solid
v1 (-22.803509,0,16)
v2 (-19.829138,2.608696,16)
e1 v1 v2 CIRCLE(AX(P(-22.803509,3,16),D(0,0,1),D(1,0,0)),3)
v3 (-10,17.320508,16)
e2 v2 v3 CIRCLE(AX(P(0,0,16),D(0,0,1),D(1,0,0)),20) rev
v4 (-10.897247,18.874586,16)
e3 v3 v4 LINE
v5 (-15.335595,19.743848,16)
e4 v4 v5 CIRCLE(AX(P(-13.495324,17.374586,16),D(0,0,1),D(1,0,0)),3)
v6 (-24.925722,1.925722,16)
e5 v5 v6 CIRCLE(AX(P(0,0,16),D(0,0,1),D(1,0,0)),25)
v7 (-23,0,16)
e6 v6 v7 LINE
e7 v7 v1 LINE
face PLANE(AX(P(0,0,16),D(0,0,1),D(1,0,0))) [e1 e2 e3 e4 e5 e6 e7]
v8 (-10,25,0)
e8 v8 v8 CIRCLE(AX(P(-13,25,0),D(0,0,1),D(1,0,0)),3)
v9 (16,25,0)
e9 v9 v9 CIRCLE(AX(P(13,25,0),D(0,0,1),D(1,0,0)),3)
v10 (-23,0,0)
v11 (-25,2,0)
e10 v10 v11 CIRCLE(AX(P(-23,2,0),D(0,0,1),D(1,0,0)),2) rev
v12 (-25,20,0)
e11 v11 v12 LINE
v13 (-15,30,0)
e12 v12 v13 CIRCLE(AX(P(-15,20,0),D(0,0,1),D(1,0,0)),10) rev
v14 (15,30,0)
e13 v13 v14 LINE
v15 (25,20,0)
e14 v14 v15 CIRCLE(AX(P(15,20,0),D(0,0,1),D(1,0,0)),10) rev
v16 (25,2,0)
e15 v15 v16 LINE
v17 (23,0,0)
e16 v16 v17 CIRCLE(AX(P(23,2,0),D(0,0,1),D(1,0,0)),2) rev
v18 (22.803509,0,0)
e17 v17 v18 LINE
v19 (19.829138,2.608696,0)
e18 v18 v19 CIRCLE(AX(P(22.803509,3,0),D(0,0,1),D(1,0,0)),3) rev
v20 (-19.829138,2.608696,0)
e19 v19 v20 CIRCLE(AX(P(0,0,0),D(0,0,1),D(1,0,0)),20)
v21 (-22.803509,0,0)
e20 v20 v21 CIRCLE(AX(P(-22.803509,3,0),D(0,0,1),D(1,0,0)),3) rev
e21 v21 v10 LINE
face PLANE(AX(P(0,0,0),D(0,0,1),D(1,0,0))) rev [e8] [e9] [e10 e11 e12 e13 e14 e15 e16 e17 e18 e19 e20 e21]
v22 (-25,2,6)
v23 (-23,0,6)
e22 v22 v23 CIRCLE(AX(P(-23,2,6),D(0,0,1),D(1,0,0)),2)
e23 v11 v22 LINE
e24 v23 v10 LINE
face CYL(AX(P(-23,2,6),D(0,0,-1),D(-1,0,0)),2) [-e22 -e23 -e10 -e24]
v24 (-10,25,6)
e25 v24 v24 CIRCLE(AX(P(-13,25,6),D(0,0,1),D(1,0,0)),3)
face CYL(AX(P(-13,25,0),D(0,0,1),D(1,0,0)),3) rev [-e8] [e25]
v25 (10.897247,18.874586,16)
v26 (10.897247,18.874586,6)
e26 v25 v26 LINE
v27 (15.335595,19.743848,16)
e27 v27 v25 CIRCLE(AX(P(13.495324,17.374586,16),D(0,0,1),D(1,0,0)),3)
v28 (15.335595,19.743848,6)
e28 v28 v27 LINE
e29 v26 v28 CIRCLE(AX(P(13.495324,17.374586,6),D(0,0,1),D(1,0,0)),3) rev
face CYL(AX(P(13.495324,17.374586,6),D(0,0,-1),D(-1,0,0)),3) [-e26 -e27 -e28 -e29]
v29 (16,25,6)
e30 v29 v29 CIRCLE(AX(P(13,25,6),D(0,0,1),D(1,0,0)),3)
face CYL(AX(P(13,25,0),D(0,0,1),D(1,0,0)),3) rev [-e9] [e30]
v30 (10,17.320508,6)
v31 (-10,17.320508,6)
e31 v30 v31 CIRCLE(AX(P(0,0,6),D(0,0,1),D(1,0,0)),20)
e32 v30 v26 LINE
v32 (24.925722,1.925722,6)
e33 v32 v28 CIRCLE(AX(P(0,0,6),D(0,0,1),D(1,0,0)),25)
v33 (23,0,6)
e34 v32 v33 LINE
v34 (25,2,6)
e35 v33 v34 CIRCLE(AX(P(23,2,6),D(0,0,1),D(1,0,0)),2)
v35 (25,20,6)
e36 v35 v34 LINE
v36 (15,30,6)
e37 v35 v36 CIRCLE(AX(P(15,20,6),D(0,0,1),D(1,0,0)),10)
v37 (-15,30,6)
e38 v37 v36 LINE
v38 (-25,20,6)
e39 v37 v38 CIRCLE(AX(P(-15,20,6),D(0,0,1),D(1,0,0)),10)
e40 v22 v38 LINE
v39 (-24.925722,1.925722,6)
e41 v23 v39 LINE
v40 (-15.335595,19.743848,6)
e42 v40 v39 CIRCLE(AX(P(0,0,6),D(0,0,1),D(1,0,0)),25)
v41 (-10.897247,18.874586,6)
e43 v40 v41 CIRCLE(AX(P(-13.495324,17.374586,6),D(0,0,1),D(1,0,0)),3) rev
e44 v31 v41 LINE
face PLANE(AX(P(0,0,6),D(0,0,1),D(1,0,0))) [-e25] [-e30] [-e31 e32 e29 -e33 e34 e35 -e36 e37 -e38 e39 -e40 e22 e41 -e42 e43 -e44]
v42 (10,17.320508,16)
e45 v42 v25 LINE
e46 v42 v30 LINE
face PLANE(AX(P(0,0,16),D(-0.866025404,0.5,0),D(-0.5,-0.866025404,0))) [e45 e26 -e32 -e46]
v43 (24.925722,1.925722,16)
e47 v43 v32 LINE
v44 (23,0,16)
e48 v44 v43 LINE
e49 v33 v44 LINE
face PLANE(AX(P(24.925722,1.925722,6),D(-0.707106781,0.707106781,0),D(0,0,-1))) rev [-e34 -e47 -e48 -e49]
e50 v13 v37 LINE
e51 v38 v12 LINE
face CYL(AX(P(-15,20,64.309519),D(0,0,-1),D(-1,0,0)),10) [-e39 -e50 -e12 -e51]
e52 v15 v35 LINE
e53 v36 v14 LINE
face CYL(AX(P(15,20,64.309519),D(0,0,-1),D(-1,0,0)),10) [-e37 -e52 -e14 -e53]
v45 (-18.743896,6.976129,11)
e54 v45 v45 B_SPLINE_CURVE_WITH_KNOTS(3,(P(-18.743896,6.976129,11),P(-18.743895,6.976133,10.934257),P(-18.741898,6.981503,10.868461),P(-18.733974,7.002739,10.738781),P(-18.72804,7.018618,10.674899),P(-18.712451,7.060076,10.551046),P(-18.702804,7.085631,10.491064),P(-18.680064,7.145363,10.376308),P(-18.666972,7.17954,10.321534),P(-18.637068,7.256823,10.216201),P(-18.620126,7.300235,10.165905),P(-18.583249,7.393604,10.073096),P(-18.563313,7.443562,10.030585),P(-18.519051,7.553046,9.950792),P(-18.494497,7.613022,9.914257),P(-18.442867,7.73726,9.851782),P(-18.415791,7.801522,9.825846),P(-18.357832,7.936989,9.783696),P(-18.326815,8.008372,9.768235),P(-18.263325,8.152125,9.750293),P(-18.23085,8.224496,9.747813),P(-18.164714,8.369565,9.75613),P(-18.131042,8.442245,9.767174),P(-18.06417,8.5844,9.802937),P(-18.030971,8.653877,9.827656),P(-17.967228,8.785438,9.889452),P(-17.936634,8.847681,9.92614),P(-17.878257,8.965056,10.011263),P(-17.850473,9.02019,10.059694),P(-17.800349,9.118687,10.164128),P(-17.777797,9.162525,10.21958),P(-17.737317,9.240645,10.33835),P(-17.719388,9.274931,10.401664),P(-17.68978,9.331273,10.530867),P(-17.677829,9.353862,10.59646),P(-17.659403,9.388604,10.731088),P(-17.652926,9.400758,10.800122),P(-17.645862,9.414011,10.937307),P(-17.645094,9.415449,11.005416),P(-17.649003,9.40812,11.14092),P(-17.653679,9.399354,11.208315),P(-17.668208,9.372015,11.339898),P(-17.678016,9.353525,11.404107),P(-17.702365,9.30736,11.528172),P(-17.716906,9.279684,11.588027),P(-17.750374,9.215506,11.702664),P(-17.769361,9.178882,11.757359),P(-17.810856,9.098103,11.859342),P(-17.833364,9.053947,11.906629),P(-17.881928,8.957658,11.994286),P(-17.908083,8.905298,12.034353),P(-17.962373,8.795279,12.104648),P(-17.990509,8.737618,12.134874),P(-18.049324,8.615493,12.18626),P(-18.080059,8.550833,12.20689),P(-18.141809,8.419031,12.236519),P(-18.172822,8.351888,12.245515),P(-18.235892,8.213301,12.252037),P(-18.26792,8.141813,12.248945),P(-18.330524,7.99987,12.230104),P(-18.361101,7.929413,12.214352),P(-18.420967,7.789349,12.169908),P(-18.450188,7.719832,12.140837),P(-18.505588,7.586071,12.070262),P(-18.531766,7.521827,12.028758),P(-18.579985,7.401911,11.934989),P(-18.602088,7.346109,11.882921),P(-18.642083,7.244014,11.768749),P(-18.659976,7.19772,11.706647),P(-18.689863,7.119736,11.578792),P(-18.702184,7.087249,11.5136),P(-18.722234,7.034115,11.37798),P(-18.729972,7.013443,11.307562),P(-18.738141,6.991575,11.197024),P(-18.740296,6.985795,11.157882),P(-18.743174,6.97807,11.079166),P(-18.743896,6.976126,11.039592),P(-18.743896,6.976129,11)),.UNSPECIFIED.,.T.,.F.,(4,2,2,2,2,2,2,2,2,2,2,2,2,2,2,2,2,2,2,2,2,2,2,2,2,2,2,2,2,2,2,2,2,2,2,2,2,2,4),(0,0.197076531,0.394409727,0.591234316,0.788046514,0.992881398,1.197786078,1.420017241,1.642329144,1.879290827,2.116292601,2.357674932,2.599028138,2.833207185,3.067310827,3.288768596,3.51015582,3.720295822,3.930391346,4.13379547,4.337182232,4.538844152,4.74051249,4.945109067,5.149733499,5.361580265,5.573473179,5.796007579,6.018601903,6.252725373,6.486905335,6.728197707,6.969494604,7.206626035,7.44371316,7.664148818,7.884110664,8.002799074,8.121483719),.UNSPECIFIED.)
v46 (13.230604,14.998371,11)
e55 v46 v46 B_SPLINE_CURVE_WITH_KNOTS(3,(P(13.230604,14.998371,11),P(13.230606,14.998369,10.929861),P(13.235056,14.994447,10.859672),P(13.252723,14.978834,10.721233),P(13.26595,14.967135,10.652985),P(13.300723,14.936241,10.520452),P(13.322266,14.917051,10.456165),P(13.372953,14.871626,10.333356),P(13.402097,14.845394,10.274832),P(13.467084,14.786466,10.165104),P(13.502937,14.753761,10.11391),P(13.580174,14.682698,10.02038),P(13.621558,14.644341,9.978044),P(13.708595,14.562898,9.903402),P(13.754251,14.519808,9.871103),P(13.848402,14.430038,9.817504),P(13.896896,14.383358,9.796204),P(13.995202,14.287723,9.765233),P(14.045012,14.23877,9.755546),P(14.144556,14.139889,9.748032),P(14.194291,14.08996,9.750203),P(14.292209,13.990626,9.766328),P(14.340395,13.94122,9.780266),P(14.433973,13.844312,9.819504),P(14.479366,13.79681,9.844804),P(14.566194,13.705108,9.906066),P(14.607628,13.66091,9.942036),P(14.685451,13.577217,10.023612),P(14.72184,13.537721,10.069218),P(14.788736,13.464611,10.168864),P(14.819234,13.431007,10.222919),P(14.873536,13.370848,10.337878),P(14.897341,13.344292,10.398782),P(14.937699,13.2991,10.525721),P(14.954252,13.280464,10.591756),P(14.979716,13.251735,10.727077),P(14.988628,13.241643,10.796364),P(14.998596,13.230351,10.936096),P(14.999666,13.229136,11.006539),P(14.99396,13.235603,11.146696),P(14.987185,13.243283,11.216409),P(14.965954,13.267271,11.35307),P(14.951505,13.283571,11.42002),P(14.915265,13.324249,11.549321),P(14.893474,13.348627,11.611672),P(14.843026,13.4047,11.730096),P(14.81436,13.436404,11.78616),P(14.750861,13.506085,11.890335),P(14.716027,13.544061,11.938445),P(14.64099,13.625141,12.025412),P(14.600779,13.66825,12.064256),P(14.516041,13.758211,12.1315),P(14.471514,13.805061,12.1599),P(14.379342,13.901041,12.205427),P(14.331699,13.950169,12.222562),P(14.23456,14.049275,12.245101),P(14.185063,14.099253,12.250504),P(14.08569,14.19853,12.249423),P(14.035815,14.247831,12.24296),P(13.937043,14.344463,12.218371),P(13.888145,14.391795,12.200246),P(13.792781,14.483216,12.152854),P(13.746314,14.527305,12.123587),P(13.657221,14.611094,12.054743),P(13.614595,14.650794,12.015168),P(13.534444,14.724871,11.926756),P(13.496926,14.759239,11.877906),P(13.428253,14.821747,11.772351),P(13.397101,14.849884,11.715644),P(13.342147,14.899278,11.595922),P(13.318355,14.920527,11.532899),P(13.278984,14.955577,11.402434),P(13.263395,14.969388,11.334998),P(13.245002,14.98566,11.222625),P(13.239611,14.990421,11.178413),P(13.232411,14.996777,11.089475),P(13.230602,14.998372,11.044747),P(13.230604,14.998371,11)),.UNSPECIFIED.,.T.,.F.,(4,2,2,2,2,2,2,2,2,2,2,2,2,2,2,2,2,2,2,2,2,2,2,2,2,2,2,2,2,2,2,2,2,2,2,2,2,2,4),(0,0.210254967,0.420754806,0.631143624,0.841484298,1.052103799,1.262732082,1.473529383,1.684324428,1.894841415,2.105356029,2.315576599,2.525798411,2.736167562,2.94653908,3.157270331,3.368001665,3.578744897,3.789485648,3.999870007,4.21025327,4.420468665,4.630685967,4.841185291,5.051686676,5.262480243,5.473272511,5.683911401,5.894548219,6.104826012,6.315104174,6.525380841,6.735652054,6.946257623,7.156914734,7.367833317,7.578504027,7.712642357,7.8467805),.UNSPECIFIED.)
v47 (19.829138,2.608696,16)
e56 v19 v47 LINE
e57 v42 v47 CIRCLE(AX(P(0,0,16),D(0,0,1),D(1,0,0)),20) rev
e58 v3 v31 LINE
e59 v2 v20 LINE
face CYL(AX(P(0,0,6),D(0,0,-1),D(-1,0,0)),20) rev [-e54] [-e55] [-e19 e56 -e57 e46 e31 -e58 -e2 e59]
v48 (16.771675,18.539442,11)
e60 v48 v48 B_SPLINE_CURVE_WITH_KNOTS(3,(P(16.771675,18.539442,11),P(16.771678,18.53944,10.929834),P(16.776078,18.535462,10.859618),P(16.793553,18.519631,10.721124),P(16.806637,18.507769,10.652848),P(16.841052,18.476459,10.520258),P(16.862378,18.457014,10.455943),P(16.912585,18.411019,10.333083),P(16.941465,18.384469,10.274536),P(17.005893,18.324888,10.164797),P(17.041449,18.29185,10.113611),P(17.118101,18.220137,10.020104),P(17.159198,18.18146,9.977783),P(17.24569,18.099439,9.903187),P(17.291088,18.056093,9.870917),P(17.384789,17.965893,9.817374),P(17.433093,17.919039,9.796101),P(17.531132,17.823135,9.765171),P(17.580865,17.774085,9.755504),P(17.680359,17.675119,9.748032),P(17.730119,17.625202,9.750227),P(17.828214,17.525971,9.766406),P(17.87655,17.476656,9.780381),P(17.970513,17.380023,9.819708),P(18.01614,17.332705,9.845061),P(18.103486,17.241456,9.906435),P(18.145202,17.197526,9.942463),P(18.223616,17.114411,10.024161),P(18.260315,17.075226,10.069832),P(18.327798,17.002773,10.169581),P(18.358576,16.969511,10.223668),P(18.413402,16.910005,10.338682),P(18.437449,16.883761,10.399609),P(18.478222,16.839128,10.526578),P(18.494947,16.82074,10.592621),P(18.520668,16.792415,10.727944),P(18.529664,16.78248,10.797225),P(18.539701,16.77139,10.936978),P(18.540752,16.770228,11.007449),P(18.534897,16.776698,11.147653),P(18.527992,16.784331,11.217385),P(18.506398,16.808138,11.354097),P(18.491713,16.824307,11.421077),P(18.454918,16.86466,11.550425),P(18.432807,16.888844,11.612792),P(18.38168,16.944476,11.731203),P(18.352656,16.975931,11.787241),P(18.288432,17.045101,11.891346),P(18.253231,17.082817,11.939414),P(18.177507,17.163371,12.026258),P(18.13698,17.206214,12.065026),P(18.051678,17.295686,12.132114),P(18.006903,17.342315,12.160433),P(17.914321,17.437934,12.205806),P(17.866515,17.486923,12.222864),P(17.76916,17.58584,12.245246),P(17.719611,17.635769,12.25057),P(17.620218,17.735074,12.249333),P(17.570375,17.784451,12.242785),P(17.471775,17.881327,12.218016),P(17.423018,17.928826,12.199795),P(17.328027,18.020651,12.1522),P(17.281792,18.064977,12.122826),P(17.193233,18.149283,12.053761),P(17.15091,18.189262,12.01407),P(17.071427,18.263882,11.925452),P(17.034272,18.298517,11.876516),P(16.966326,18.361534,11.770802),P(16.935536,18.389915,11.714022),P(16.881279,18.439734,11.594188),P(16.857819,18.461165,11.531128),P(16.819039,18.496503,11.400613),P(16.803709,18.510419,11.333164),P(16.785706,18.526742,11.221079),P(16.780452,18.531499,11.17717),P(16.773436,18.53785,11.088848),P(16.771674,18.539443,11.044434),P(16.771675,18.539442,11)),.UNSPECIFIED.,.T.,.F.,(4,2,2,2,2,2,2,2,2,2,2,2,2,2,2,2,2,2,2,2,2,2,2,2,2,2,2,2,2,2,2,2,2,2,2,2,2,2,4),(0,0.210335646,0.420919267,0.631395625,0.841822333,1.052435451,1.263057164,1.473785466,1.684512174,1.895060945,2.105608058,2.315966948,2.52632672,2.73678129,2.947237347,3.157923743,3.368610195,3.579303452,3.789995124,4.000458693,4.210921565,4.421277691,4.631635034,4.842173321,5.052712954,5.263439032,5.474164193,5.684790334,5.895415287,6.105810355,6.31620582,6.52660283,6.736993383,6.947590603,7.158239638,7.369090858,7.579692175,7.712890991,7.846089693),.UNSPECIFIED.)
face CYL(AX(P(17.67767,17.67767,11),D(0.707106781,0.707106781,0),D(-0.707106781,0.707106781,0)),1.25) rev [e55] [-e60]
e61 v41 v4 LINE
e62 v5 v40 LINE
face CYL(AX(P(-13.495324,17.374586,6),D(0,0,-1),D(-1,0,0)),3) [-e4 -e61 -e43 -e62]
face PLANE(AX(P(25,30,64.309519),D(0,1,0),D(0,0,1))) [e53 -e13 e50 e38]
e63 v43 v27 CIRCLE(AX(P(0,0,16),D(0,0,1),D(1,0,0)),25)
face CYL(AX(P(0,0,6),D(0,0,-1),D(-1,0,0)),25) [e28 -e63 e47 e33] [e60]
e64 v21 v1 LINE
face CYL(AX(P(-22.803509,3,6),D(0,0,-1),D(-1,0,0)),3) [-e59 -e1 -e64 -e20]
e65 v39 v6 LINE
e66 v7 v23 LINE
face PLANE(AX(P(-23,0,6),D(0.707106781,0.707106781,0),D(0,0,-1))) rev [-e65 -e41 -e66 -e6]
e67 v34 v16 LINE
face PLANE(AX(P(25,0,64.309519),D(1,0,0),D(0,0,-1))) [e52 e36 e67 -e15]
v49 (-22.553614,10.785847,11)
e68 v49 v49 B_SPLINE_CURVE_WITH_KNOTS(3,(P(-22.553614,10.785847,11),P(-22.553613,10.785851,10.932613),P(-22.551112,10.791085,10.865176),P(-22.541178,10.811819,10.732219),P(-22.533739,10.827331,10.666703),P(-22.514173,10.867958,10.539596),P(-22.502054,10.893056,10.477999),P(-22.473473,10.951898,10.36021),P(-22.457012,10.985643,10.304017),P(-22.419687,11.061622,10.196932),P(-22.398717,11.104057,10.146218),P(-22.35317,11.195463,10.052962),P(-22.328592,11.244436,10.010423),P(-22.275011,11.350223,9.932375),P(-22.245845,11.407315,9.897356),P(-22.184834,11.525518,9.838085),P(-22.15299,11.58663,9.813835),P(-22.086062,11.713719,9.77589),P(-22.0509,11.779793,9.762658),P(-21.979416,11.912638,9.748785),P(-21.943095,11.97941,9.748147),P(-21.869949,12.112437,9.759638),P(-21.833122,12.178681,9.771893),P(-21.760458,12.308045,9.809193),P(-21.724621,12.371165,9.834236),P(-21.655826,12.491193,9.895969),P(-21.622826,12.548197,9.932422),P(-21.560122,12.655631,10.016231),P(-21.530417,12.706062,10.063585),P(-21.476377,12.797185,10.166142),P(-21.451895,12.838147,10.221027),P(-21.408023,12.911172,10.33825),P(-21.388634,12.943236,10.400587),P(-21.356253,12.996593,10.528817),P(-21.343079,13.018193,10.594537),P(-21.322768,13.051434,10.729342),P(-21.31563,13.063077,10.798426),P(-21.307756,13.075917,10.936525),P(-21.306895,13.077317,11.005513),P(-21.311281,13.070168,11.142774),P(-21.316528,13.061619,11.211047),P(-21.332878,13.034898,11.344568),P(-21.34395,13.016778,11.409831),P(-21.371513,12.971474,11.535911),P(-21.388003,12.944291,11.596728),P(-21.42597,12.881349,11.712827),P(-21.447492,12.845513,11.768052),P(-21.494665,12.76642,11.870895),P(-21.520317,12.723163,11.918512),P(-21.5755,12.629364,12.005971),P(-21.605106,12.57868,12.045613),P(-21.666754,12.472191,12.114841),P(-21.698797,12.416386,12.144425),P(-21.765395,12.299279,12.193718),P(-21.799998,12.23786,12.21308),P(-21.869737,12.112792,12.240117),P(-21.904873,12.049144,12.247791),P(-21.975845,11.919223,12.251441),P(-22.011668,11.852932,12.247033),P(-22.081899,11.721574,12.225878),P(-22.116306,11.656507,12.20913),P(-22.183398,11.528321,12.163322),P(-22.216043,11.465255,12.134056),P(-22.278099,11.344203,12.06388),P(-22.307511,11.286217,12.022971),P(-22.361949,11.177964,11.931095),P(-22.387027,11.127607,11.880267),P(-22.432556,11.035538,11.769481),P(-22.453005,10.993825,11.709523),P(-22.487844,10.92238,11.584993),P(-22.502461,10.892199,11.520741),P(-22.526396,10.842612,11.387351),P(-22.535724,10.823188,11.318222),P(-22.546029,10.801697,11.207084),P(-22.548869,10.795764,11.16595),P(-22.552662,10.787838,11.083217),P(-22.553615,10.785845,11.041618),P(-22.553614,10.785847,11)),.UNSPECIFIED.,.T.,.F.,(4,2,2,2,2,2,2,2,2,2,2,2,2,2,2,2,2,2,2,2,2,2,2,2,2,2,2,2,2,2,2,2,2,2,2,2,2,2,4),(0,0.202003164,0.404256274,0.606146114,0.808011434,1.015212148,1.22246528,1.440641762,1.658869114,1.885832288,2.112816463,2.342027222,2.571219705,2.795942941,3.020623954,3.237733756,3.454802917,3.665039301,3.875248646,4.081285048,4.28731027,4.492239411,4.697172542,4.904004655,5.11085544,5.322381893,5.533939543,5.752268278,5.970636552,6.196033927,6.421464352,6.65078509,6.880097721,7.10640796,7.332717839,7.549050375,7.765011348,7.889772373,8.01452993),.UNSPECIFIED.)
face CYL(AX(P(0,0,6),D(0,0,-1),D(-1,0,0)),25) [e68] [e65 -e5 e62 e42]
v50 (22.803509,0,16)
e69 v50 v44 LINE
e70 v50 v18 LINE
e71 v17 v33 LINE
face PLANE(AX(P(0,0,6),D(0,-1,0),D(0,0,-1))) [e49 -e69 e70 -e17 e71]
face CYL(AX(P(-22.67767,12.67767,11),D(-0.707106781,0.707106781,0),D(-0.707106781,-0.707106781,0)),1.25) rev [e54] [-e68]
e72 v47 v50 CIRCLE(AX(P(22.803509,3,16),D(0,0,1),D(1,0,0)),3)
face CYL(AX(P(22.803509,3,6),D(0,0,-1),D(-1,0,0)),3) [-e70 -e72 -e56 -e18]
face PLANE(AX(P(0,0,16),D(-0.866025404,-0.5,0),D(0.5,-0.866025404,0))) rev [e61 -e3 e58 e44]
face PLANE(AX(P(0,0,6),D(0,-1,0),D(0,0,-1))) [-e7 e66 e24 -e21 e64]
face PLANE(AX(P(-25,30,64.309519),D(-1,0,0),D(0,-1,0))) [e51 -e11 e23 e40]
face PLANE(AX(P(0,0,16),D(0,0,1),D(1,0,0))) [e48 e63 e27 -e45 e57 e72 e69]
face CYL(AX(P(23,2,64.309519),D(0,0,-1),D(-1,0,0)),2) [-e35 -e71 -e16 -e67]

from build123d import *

# Parameters (mm, degrees)
BOSS_EXTRUDE1_DEPTH     = 6
BOSS_EXTRUDE2_DEPTH     = 10
BOSS_EXTRUDE3_DEPTH     = 6
SKETCH4_R               = 3
CUT_EXTRUDE1_DEPTH      = 41.311288741
TAP_DRILL_FOR_M3_TAP1_D = 2.5
TAP_DRILL_FOR_M3_TAP2_D = 2.5
CHAMFER1_SIZE           = 2
FILLET1_R               = 3
FILLET2_R               = 10
FILLET3_R               = 2


with BuildPart() as part:
    # Sketch1 → Boss-Extrude1 (new body)
    with BuildSketch(Plane.XY):
        with BuildLine():
            Line((20, 0), (25, 0))
            ThreePointArc((25, 0), (0, 25), (-25, 0))
            Line((-25, 0), (-20, 0))
            ThreePointArc((-20, 0), (0, 20), (20, 0))
        make_face()
    extrude(amount=BOSS_EXTRUDE1_DEPTH)

    # Sketch2 → Boss-Extrude2 (add)
    with BuildSketch(Plane.XY.offset(6)):
        with BuildLine():
            ThreePointArc((-20, 0), (-17.320508076, 10), (-10, 17.320508076))
            Line((-10, 17.320508076), (-12.5, 21.650635095))
            ThreePointArc((-12.5, 21.650635095), (-21.650635095, 12.5), (-25, 0))
            Line((-25, 0), (-20, 0))
        make_face()
        with BuildLine():
            Line((12.5, 21.650635095), (10, 17.320508076))
            ThreePointArc((10, 17.320508076), (17.320508076, 10), (20, 0))
            Line((20, 0), (25, 0))
            ThreePointArc((25, 0), (21.650635095, 12.5), (12.5, 21.650635095))
        make_face()
    extrude(amount=BOSS_EXTRUDE2_DEPTH)

    # Sketch3 → Boss-Extrude3 (add)
    with BuildSketch(Plane(origin=(0, 0, 0), x_dir=(-1, 0, 0), z_dir=(0, 0, -1))):
        with BuildLine():
            Line((-25, 0), (-25, 30))
            Line((-25, 30), (25, 30))
            Line((25, 30), (25, 0))
            ThreePointArc((25, 0), (0, 25), (-25, 0))
        make_face()
    extrude(amount=-BOSS_EXTRUDE3_DEPTH)

    # Sketch4 → Cut-Extrude1 (cut, through all)
    with BuildSketch(Plane.XY.offset(6)):
        with Locations((13, 25)):
            Circle(SKETCH4_R)
        with Locations((-13, 25)):
            Circle(SKETCH4_R)
    extrude(amount=-CUT_EXTRUDE1_DEPTH, mode=Mode.SUBTRACT)

    # Tap Drill for M3 Tap1 (through all)
    with Locations(Plane(origin=(-17.67766953, 17.67766953, 0), x_dir=(0, 0, -1), z_dir=(-0.7071067811865488, 0.7071067811865464, 0))):
        with Locations((-11, 7.071067812)):
            Hole(TAP_DRILL_FOR_M3_TAP1_D / 2)

    # Tap Drill for M3 Tap2 (through all)
    with Locations(Plane(origin=(17.67766953, 17.67766953, 0), x_dir=(0, 0, -1), z_dir=(0.7071067811865488, 0.7071067811865464, 0))):
        with Locations((-11, 0)):
            Hole(TAP_DRILL_FOR_M3_TAP2_D / 2)

    # Chamfer1
    # the kernel refuses this chamfer: 2 mm, written as the material it takes off along each edge
    with BuildSketch(Plane(origin=(-25, 0, 21.143365976), x_dir=(1, 0, 0), z_dir=(0, 0, -1))) as chamfer1_piece_1:
        with BuildLine():
            Line((CHAMFER1_SIZE, 0), (0.074278418, -1.925721582))
            ThreePointArc((0.074278418, -1.925721582), (0.019638133, -0.990717402), (0, 0))
            Line((0, 0), (CHAMFER1_SIZE, 0))
        make_face()
    extrude(amount=15.143365976, mode=Mode.SUBTRACT)
    with BuildSketch(Plane(origin=(25, 0, 21.143365976), x_dir=(-1, 0, 0), z_dir=(0, 0, -1))) as chamfer1_piece_2:
        with BuildLine():
            Line((CHAMFER1_SIZE, 0), (0.074278418, 1.925721582))
            ThreePointArc((0.074278418, 1.925721582), (0.019638133, 0.990717402), (0, 0))
            Line((0, 0), (CHAMFER1_SIZE, 0))
        make_face()
    extrude(amount=15.143365976, mode=Mode.SUBTRACT)

    # Fillet1
    fillet1_edges = [part.edges().sort_by_distance(p)[0] for p in [
        (-12.5, 21.650635095, 11),
        (12.5, 21.650635095, 11),
        (20, 0, 8),
        (-20, 0, 8),
    ]]
    fillet(fillet1_edges, radius=FILLET1_R)

    # Fillet2
    fillet2_edges = [part.edges().sort_by_distance(p)[0] for p in [
        (-25, 30, 3),
        (25, 30, 3),
    ]]
    fillet(fillet2_edges, radius=FILLET2_R)

    # Fillet3
    fillet3_edges = [part.edges().sort_by_distance(p)[0] for p in [
        (25, 0, 3),
        (-25, 0, 3),
    ]]
    fillet(fillet3_edges, radius=FILLET3_R)


solid = part.part
